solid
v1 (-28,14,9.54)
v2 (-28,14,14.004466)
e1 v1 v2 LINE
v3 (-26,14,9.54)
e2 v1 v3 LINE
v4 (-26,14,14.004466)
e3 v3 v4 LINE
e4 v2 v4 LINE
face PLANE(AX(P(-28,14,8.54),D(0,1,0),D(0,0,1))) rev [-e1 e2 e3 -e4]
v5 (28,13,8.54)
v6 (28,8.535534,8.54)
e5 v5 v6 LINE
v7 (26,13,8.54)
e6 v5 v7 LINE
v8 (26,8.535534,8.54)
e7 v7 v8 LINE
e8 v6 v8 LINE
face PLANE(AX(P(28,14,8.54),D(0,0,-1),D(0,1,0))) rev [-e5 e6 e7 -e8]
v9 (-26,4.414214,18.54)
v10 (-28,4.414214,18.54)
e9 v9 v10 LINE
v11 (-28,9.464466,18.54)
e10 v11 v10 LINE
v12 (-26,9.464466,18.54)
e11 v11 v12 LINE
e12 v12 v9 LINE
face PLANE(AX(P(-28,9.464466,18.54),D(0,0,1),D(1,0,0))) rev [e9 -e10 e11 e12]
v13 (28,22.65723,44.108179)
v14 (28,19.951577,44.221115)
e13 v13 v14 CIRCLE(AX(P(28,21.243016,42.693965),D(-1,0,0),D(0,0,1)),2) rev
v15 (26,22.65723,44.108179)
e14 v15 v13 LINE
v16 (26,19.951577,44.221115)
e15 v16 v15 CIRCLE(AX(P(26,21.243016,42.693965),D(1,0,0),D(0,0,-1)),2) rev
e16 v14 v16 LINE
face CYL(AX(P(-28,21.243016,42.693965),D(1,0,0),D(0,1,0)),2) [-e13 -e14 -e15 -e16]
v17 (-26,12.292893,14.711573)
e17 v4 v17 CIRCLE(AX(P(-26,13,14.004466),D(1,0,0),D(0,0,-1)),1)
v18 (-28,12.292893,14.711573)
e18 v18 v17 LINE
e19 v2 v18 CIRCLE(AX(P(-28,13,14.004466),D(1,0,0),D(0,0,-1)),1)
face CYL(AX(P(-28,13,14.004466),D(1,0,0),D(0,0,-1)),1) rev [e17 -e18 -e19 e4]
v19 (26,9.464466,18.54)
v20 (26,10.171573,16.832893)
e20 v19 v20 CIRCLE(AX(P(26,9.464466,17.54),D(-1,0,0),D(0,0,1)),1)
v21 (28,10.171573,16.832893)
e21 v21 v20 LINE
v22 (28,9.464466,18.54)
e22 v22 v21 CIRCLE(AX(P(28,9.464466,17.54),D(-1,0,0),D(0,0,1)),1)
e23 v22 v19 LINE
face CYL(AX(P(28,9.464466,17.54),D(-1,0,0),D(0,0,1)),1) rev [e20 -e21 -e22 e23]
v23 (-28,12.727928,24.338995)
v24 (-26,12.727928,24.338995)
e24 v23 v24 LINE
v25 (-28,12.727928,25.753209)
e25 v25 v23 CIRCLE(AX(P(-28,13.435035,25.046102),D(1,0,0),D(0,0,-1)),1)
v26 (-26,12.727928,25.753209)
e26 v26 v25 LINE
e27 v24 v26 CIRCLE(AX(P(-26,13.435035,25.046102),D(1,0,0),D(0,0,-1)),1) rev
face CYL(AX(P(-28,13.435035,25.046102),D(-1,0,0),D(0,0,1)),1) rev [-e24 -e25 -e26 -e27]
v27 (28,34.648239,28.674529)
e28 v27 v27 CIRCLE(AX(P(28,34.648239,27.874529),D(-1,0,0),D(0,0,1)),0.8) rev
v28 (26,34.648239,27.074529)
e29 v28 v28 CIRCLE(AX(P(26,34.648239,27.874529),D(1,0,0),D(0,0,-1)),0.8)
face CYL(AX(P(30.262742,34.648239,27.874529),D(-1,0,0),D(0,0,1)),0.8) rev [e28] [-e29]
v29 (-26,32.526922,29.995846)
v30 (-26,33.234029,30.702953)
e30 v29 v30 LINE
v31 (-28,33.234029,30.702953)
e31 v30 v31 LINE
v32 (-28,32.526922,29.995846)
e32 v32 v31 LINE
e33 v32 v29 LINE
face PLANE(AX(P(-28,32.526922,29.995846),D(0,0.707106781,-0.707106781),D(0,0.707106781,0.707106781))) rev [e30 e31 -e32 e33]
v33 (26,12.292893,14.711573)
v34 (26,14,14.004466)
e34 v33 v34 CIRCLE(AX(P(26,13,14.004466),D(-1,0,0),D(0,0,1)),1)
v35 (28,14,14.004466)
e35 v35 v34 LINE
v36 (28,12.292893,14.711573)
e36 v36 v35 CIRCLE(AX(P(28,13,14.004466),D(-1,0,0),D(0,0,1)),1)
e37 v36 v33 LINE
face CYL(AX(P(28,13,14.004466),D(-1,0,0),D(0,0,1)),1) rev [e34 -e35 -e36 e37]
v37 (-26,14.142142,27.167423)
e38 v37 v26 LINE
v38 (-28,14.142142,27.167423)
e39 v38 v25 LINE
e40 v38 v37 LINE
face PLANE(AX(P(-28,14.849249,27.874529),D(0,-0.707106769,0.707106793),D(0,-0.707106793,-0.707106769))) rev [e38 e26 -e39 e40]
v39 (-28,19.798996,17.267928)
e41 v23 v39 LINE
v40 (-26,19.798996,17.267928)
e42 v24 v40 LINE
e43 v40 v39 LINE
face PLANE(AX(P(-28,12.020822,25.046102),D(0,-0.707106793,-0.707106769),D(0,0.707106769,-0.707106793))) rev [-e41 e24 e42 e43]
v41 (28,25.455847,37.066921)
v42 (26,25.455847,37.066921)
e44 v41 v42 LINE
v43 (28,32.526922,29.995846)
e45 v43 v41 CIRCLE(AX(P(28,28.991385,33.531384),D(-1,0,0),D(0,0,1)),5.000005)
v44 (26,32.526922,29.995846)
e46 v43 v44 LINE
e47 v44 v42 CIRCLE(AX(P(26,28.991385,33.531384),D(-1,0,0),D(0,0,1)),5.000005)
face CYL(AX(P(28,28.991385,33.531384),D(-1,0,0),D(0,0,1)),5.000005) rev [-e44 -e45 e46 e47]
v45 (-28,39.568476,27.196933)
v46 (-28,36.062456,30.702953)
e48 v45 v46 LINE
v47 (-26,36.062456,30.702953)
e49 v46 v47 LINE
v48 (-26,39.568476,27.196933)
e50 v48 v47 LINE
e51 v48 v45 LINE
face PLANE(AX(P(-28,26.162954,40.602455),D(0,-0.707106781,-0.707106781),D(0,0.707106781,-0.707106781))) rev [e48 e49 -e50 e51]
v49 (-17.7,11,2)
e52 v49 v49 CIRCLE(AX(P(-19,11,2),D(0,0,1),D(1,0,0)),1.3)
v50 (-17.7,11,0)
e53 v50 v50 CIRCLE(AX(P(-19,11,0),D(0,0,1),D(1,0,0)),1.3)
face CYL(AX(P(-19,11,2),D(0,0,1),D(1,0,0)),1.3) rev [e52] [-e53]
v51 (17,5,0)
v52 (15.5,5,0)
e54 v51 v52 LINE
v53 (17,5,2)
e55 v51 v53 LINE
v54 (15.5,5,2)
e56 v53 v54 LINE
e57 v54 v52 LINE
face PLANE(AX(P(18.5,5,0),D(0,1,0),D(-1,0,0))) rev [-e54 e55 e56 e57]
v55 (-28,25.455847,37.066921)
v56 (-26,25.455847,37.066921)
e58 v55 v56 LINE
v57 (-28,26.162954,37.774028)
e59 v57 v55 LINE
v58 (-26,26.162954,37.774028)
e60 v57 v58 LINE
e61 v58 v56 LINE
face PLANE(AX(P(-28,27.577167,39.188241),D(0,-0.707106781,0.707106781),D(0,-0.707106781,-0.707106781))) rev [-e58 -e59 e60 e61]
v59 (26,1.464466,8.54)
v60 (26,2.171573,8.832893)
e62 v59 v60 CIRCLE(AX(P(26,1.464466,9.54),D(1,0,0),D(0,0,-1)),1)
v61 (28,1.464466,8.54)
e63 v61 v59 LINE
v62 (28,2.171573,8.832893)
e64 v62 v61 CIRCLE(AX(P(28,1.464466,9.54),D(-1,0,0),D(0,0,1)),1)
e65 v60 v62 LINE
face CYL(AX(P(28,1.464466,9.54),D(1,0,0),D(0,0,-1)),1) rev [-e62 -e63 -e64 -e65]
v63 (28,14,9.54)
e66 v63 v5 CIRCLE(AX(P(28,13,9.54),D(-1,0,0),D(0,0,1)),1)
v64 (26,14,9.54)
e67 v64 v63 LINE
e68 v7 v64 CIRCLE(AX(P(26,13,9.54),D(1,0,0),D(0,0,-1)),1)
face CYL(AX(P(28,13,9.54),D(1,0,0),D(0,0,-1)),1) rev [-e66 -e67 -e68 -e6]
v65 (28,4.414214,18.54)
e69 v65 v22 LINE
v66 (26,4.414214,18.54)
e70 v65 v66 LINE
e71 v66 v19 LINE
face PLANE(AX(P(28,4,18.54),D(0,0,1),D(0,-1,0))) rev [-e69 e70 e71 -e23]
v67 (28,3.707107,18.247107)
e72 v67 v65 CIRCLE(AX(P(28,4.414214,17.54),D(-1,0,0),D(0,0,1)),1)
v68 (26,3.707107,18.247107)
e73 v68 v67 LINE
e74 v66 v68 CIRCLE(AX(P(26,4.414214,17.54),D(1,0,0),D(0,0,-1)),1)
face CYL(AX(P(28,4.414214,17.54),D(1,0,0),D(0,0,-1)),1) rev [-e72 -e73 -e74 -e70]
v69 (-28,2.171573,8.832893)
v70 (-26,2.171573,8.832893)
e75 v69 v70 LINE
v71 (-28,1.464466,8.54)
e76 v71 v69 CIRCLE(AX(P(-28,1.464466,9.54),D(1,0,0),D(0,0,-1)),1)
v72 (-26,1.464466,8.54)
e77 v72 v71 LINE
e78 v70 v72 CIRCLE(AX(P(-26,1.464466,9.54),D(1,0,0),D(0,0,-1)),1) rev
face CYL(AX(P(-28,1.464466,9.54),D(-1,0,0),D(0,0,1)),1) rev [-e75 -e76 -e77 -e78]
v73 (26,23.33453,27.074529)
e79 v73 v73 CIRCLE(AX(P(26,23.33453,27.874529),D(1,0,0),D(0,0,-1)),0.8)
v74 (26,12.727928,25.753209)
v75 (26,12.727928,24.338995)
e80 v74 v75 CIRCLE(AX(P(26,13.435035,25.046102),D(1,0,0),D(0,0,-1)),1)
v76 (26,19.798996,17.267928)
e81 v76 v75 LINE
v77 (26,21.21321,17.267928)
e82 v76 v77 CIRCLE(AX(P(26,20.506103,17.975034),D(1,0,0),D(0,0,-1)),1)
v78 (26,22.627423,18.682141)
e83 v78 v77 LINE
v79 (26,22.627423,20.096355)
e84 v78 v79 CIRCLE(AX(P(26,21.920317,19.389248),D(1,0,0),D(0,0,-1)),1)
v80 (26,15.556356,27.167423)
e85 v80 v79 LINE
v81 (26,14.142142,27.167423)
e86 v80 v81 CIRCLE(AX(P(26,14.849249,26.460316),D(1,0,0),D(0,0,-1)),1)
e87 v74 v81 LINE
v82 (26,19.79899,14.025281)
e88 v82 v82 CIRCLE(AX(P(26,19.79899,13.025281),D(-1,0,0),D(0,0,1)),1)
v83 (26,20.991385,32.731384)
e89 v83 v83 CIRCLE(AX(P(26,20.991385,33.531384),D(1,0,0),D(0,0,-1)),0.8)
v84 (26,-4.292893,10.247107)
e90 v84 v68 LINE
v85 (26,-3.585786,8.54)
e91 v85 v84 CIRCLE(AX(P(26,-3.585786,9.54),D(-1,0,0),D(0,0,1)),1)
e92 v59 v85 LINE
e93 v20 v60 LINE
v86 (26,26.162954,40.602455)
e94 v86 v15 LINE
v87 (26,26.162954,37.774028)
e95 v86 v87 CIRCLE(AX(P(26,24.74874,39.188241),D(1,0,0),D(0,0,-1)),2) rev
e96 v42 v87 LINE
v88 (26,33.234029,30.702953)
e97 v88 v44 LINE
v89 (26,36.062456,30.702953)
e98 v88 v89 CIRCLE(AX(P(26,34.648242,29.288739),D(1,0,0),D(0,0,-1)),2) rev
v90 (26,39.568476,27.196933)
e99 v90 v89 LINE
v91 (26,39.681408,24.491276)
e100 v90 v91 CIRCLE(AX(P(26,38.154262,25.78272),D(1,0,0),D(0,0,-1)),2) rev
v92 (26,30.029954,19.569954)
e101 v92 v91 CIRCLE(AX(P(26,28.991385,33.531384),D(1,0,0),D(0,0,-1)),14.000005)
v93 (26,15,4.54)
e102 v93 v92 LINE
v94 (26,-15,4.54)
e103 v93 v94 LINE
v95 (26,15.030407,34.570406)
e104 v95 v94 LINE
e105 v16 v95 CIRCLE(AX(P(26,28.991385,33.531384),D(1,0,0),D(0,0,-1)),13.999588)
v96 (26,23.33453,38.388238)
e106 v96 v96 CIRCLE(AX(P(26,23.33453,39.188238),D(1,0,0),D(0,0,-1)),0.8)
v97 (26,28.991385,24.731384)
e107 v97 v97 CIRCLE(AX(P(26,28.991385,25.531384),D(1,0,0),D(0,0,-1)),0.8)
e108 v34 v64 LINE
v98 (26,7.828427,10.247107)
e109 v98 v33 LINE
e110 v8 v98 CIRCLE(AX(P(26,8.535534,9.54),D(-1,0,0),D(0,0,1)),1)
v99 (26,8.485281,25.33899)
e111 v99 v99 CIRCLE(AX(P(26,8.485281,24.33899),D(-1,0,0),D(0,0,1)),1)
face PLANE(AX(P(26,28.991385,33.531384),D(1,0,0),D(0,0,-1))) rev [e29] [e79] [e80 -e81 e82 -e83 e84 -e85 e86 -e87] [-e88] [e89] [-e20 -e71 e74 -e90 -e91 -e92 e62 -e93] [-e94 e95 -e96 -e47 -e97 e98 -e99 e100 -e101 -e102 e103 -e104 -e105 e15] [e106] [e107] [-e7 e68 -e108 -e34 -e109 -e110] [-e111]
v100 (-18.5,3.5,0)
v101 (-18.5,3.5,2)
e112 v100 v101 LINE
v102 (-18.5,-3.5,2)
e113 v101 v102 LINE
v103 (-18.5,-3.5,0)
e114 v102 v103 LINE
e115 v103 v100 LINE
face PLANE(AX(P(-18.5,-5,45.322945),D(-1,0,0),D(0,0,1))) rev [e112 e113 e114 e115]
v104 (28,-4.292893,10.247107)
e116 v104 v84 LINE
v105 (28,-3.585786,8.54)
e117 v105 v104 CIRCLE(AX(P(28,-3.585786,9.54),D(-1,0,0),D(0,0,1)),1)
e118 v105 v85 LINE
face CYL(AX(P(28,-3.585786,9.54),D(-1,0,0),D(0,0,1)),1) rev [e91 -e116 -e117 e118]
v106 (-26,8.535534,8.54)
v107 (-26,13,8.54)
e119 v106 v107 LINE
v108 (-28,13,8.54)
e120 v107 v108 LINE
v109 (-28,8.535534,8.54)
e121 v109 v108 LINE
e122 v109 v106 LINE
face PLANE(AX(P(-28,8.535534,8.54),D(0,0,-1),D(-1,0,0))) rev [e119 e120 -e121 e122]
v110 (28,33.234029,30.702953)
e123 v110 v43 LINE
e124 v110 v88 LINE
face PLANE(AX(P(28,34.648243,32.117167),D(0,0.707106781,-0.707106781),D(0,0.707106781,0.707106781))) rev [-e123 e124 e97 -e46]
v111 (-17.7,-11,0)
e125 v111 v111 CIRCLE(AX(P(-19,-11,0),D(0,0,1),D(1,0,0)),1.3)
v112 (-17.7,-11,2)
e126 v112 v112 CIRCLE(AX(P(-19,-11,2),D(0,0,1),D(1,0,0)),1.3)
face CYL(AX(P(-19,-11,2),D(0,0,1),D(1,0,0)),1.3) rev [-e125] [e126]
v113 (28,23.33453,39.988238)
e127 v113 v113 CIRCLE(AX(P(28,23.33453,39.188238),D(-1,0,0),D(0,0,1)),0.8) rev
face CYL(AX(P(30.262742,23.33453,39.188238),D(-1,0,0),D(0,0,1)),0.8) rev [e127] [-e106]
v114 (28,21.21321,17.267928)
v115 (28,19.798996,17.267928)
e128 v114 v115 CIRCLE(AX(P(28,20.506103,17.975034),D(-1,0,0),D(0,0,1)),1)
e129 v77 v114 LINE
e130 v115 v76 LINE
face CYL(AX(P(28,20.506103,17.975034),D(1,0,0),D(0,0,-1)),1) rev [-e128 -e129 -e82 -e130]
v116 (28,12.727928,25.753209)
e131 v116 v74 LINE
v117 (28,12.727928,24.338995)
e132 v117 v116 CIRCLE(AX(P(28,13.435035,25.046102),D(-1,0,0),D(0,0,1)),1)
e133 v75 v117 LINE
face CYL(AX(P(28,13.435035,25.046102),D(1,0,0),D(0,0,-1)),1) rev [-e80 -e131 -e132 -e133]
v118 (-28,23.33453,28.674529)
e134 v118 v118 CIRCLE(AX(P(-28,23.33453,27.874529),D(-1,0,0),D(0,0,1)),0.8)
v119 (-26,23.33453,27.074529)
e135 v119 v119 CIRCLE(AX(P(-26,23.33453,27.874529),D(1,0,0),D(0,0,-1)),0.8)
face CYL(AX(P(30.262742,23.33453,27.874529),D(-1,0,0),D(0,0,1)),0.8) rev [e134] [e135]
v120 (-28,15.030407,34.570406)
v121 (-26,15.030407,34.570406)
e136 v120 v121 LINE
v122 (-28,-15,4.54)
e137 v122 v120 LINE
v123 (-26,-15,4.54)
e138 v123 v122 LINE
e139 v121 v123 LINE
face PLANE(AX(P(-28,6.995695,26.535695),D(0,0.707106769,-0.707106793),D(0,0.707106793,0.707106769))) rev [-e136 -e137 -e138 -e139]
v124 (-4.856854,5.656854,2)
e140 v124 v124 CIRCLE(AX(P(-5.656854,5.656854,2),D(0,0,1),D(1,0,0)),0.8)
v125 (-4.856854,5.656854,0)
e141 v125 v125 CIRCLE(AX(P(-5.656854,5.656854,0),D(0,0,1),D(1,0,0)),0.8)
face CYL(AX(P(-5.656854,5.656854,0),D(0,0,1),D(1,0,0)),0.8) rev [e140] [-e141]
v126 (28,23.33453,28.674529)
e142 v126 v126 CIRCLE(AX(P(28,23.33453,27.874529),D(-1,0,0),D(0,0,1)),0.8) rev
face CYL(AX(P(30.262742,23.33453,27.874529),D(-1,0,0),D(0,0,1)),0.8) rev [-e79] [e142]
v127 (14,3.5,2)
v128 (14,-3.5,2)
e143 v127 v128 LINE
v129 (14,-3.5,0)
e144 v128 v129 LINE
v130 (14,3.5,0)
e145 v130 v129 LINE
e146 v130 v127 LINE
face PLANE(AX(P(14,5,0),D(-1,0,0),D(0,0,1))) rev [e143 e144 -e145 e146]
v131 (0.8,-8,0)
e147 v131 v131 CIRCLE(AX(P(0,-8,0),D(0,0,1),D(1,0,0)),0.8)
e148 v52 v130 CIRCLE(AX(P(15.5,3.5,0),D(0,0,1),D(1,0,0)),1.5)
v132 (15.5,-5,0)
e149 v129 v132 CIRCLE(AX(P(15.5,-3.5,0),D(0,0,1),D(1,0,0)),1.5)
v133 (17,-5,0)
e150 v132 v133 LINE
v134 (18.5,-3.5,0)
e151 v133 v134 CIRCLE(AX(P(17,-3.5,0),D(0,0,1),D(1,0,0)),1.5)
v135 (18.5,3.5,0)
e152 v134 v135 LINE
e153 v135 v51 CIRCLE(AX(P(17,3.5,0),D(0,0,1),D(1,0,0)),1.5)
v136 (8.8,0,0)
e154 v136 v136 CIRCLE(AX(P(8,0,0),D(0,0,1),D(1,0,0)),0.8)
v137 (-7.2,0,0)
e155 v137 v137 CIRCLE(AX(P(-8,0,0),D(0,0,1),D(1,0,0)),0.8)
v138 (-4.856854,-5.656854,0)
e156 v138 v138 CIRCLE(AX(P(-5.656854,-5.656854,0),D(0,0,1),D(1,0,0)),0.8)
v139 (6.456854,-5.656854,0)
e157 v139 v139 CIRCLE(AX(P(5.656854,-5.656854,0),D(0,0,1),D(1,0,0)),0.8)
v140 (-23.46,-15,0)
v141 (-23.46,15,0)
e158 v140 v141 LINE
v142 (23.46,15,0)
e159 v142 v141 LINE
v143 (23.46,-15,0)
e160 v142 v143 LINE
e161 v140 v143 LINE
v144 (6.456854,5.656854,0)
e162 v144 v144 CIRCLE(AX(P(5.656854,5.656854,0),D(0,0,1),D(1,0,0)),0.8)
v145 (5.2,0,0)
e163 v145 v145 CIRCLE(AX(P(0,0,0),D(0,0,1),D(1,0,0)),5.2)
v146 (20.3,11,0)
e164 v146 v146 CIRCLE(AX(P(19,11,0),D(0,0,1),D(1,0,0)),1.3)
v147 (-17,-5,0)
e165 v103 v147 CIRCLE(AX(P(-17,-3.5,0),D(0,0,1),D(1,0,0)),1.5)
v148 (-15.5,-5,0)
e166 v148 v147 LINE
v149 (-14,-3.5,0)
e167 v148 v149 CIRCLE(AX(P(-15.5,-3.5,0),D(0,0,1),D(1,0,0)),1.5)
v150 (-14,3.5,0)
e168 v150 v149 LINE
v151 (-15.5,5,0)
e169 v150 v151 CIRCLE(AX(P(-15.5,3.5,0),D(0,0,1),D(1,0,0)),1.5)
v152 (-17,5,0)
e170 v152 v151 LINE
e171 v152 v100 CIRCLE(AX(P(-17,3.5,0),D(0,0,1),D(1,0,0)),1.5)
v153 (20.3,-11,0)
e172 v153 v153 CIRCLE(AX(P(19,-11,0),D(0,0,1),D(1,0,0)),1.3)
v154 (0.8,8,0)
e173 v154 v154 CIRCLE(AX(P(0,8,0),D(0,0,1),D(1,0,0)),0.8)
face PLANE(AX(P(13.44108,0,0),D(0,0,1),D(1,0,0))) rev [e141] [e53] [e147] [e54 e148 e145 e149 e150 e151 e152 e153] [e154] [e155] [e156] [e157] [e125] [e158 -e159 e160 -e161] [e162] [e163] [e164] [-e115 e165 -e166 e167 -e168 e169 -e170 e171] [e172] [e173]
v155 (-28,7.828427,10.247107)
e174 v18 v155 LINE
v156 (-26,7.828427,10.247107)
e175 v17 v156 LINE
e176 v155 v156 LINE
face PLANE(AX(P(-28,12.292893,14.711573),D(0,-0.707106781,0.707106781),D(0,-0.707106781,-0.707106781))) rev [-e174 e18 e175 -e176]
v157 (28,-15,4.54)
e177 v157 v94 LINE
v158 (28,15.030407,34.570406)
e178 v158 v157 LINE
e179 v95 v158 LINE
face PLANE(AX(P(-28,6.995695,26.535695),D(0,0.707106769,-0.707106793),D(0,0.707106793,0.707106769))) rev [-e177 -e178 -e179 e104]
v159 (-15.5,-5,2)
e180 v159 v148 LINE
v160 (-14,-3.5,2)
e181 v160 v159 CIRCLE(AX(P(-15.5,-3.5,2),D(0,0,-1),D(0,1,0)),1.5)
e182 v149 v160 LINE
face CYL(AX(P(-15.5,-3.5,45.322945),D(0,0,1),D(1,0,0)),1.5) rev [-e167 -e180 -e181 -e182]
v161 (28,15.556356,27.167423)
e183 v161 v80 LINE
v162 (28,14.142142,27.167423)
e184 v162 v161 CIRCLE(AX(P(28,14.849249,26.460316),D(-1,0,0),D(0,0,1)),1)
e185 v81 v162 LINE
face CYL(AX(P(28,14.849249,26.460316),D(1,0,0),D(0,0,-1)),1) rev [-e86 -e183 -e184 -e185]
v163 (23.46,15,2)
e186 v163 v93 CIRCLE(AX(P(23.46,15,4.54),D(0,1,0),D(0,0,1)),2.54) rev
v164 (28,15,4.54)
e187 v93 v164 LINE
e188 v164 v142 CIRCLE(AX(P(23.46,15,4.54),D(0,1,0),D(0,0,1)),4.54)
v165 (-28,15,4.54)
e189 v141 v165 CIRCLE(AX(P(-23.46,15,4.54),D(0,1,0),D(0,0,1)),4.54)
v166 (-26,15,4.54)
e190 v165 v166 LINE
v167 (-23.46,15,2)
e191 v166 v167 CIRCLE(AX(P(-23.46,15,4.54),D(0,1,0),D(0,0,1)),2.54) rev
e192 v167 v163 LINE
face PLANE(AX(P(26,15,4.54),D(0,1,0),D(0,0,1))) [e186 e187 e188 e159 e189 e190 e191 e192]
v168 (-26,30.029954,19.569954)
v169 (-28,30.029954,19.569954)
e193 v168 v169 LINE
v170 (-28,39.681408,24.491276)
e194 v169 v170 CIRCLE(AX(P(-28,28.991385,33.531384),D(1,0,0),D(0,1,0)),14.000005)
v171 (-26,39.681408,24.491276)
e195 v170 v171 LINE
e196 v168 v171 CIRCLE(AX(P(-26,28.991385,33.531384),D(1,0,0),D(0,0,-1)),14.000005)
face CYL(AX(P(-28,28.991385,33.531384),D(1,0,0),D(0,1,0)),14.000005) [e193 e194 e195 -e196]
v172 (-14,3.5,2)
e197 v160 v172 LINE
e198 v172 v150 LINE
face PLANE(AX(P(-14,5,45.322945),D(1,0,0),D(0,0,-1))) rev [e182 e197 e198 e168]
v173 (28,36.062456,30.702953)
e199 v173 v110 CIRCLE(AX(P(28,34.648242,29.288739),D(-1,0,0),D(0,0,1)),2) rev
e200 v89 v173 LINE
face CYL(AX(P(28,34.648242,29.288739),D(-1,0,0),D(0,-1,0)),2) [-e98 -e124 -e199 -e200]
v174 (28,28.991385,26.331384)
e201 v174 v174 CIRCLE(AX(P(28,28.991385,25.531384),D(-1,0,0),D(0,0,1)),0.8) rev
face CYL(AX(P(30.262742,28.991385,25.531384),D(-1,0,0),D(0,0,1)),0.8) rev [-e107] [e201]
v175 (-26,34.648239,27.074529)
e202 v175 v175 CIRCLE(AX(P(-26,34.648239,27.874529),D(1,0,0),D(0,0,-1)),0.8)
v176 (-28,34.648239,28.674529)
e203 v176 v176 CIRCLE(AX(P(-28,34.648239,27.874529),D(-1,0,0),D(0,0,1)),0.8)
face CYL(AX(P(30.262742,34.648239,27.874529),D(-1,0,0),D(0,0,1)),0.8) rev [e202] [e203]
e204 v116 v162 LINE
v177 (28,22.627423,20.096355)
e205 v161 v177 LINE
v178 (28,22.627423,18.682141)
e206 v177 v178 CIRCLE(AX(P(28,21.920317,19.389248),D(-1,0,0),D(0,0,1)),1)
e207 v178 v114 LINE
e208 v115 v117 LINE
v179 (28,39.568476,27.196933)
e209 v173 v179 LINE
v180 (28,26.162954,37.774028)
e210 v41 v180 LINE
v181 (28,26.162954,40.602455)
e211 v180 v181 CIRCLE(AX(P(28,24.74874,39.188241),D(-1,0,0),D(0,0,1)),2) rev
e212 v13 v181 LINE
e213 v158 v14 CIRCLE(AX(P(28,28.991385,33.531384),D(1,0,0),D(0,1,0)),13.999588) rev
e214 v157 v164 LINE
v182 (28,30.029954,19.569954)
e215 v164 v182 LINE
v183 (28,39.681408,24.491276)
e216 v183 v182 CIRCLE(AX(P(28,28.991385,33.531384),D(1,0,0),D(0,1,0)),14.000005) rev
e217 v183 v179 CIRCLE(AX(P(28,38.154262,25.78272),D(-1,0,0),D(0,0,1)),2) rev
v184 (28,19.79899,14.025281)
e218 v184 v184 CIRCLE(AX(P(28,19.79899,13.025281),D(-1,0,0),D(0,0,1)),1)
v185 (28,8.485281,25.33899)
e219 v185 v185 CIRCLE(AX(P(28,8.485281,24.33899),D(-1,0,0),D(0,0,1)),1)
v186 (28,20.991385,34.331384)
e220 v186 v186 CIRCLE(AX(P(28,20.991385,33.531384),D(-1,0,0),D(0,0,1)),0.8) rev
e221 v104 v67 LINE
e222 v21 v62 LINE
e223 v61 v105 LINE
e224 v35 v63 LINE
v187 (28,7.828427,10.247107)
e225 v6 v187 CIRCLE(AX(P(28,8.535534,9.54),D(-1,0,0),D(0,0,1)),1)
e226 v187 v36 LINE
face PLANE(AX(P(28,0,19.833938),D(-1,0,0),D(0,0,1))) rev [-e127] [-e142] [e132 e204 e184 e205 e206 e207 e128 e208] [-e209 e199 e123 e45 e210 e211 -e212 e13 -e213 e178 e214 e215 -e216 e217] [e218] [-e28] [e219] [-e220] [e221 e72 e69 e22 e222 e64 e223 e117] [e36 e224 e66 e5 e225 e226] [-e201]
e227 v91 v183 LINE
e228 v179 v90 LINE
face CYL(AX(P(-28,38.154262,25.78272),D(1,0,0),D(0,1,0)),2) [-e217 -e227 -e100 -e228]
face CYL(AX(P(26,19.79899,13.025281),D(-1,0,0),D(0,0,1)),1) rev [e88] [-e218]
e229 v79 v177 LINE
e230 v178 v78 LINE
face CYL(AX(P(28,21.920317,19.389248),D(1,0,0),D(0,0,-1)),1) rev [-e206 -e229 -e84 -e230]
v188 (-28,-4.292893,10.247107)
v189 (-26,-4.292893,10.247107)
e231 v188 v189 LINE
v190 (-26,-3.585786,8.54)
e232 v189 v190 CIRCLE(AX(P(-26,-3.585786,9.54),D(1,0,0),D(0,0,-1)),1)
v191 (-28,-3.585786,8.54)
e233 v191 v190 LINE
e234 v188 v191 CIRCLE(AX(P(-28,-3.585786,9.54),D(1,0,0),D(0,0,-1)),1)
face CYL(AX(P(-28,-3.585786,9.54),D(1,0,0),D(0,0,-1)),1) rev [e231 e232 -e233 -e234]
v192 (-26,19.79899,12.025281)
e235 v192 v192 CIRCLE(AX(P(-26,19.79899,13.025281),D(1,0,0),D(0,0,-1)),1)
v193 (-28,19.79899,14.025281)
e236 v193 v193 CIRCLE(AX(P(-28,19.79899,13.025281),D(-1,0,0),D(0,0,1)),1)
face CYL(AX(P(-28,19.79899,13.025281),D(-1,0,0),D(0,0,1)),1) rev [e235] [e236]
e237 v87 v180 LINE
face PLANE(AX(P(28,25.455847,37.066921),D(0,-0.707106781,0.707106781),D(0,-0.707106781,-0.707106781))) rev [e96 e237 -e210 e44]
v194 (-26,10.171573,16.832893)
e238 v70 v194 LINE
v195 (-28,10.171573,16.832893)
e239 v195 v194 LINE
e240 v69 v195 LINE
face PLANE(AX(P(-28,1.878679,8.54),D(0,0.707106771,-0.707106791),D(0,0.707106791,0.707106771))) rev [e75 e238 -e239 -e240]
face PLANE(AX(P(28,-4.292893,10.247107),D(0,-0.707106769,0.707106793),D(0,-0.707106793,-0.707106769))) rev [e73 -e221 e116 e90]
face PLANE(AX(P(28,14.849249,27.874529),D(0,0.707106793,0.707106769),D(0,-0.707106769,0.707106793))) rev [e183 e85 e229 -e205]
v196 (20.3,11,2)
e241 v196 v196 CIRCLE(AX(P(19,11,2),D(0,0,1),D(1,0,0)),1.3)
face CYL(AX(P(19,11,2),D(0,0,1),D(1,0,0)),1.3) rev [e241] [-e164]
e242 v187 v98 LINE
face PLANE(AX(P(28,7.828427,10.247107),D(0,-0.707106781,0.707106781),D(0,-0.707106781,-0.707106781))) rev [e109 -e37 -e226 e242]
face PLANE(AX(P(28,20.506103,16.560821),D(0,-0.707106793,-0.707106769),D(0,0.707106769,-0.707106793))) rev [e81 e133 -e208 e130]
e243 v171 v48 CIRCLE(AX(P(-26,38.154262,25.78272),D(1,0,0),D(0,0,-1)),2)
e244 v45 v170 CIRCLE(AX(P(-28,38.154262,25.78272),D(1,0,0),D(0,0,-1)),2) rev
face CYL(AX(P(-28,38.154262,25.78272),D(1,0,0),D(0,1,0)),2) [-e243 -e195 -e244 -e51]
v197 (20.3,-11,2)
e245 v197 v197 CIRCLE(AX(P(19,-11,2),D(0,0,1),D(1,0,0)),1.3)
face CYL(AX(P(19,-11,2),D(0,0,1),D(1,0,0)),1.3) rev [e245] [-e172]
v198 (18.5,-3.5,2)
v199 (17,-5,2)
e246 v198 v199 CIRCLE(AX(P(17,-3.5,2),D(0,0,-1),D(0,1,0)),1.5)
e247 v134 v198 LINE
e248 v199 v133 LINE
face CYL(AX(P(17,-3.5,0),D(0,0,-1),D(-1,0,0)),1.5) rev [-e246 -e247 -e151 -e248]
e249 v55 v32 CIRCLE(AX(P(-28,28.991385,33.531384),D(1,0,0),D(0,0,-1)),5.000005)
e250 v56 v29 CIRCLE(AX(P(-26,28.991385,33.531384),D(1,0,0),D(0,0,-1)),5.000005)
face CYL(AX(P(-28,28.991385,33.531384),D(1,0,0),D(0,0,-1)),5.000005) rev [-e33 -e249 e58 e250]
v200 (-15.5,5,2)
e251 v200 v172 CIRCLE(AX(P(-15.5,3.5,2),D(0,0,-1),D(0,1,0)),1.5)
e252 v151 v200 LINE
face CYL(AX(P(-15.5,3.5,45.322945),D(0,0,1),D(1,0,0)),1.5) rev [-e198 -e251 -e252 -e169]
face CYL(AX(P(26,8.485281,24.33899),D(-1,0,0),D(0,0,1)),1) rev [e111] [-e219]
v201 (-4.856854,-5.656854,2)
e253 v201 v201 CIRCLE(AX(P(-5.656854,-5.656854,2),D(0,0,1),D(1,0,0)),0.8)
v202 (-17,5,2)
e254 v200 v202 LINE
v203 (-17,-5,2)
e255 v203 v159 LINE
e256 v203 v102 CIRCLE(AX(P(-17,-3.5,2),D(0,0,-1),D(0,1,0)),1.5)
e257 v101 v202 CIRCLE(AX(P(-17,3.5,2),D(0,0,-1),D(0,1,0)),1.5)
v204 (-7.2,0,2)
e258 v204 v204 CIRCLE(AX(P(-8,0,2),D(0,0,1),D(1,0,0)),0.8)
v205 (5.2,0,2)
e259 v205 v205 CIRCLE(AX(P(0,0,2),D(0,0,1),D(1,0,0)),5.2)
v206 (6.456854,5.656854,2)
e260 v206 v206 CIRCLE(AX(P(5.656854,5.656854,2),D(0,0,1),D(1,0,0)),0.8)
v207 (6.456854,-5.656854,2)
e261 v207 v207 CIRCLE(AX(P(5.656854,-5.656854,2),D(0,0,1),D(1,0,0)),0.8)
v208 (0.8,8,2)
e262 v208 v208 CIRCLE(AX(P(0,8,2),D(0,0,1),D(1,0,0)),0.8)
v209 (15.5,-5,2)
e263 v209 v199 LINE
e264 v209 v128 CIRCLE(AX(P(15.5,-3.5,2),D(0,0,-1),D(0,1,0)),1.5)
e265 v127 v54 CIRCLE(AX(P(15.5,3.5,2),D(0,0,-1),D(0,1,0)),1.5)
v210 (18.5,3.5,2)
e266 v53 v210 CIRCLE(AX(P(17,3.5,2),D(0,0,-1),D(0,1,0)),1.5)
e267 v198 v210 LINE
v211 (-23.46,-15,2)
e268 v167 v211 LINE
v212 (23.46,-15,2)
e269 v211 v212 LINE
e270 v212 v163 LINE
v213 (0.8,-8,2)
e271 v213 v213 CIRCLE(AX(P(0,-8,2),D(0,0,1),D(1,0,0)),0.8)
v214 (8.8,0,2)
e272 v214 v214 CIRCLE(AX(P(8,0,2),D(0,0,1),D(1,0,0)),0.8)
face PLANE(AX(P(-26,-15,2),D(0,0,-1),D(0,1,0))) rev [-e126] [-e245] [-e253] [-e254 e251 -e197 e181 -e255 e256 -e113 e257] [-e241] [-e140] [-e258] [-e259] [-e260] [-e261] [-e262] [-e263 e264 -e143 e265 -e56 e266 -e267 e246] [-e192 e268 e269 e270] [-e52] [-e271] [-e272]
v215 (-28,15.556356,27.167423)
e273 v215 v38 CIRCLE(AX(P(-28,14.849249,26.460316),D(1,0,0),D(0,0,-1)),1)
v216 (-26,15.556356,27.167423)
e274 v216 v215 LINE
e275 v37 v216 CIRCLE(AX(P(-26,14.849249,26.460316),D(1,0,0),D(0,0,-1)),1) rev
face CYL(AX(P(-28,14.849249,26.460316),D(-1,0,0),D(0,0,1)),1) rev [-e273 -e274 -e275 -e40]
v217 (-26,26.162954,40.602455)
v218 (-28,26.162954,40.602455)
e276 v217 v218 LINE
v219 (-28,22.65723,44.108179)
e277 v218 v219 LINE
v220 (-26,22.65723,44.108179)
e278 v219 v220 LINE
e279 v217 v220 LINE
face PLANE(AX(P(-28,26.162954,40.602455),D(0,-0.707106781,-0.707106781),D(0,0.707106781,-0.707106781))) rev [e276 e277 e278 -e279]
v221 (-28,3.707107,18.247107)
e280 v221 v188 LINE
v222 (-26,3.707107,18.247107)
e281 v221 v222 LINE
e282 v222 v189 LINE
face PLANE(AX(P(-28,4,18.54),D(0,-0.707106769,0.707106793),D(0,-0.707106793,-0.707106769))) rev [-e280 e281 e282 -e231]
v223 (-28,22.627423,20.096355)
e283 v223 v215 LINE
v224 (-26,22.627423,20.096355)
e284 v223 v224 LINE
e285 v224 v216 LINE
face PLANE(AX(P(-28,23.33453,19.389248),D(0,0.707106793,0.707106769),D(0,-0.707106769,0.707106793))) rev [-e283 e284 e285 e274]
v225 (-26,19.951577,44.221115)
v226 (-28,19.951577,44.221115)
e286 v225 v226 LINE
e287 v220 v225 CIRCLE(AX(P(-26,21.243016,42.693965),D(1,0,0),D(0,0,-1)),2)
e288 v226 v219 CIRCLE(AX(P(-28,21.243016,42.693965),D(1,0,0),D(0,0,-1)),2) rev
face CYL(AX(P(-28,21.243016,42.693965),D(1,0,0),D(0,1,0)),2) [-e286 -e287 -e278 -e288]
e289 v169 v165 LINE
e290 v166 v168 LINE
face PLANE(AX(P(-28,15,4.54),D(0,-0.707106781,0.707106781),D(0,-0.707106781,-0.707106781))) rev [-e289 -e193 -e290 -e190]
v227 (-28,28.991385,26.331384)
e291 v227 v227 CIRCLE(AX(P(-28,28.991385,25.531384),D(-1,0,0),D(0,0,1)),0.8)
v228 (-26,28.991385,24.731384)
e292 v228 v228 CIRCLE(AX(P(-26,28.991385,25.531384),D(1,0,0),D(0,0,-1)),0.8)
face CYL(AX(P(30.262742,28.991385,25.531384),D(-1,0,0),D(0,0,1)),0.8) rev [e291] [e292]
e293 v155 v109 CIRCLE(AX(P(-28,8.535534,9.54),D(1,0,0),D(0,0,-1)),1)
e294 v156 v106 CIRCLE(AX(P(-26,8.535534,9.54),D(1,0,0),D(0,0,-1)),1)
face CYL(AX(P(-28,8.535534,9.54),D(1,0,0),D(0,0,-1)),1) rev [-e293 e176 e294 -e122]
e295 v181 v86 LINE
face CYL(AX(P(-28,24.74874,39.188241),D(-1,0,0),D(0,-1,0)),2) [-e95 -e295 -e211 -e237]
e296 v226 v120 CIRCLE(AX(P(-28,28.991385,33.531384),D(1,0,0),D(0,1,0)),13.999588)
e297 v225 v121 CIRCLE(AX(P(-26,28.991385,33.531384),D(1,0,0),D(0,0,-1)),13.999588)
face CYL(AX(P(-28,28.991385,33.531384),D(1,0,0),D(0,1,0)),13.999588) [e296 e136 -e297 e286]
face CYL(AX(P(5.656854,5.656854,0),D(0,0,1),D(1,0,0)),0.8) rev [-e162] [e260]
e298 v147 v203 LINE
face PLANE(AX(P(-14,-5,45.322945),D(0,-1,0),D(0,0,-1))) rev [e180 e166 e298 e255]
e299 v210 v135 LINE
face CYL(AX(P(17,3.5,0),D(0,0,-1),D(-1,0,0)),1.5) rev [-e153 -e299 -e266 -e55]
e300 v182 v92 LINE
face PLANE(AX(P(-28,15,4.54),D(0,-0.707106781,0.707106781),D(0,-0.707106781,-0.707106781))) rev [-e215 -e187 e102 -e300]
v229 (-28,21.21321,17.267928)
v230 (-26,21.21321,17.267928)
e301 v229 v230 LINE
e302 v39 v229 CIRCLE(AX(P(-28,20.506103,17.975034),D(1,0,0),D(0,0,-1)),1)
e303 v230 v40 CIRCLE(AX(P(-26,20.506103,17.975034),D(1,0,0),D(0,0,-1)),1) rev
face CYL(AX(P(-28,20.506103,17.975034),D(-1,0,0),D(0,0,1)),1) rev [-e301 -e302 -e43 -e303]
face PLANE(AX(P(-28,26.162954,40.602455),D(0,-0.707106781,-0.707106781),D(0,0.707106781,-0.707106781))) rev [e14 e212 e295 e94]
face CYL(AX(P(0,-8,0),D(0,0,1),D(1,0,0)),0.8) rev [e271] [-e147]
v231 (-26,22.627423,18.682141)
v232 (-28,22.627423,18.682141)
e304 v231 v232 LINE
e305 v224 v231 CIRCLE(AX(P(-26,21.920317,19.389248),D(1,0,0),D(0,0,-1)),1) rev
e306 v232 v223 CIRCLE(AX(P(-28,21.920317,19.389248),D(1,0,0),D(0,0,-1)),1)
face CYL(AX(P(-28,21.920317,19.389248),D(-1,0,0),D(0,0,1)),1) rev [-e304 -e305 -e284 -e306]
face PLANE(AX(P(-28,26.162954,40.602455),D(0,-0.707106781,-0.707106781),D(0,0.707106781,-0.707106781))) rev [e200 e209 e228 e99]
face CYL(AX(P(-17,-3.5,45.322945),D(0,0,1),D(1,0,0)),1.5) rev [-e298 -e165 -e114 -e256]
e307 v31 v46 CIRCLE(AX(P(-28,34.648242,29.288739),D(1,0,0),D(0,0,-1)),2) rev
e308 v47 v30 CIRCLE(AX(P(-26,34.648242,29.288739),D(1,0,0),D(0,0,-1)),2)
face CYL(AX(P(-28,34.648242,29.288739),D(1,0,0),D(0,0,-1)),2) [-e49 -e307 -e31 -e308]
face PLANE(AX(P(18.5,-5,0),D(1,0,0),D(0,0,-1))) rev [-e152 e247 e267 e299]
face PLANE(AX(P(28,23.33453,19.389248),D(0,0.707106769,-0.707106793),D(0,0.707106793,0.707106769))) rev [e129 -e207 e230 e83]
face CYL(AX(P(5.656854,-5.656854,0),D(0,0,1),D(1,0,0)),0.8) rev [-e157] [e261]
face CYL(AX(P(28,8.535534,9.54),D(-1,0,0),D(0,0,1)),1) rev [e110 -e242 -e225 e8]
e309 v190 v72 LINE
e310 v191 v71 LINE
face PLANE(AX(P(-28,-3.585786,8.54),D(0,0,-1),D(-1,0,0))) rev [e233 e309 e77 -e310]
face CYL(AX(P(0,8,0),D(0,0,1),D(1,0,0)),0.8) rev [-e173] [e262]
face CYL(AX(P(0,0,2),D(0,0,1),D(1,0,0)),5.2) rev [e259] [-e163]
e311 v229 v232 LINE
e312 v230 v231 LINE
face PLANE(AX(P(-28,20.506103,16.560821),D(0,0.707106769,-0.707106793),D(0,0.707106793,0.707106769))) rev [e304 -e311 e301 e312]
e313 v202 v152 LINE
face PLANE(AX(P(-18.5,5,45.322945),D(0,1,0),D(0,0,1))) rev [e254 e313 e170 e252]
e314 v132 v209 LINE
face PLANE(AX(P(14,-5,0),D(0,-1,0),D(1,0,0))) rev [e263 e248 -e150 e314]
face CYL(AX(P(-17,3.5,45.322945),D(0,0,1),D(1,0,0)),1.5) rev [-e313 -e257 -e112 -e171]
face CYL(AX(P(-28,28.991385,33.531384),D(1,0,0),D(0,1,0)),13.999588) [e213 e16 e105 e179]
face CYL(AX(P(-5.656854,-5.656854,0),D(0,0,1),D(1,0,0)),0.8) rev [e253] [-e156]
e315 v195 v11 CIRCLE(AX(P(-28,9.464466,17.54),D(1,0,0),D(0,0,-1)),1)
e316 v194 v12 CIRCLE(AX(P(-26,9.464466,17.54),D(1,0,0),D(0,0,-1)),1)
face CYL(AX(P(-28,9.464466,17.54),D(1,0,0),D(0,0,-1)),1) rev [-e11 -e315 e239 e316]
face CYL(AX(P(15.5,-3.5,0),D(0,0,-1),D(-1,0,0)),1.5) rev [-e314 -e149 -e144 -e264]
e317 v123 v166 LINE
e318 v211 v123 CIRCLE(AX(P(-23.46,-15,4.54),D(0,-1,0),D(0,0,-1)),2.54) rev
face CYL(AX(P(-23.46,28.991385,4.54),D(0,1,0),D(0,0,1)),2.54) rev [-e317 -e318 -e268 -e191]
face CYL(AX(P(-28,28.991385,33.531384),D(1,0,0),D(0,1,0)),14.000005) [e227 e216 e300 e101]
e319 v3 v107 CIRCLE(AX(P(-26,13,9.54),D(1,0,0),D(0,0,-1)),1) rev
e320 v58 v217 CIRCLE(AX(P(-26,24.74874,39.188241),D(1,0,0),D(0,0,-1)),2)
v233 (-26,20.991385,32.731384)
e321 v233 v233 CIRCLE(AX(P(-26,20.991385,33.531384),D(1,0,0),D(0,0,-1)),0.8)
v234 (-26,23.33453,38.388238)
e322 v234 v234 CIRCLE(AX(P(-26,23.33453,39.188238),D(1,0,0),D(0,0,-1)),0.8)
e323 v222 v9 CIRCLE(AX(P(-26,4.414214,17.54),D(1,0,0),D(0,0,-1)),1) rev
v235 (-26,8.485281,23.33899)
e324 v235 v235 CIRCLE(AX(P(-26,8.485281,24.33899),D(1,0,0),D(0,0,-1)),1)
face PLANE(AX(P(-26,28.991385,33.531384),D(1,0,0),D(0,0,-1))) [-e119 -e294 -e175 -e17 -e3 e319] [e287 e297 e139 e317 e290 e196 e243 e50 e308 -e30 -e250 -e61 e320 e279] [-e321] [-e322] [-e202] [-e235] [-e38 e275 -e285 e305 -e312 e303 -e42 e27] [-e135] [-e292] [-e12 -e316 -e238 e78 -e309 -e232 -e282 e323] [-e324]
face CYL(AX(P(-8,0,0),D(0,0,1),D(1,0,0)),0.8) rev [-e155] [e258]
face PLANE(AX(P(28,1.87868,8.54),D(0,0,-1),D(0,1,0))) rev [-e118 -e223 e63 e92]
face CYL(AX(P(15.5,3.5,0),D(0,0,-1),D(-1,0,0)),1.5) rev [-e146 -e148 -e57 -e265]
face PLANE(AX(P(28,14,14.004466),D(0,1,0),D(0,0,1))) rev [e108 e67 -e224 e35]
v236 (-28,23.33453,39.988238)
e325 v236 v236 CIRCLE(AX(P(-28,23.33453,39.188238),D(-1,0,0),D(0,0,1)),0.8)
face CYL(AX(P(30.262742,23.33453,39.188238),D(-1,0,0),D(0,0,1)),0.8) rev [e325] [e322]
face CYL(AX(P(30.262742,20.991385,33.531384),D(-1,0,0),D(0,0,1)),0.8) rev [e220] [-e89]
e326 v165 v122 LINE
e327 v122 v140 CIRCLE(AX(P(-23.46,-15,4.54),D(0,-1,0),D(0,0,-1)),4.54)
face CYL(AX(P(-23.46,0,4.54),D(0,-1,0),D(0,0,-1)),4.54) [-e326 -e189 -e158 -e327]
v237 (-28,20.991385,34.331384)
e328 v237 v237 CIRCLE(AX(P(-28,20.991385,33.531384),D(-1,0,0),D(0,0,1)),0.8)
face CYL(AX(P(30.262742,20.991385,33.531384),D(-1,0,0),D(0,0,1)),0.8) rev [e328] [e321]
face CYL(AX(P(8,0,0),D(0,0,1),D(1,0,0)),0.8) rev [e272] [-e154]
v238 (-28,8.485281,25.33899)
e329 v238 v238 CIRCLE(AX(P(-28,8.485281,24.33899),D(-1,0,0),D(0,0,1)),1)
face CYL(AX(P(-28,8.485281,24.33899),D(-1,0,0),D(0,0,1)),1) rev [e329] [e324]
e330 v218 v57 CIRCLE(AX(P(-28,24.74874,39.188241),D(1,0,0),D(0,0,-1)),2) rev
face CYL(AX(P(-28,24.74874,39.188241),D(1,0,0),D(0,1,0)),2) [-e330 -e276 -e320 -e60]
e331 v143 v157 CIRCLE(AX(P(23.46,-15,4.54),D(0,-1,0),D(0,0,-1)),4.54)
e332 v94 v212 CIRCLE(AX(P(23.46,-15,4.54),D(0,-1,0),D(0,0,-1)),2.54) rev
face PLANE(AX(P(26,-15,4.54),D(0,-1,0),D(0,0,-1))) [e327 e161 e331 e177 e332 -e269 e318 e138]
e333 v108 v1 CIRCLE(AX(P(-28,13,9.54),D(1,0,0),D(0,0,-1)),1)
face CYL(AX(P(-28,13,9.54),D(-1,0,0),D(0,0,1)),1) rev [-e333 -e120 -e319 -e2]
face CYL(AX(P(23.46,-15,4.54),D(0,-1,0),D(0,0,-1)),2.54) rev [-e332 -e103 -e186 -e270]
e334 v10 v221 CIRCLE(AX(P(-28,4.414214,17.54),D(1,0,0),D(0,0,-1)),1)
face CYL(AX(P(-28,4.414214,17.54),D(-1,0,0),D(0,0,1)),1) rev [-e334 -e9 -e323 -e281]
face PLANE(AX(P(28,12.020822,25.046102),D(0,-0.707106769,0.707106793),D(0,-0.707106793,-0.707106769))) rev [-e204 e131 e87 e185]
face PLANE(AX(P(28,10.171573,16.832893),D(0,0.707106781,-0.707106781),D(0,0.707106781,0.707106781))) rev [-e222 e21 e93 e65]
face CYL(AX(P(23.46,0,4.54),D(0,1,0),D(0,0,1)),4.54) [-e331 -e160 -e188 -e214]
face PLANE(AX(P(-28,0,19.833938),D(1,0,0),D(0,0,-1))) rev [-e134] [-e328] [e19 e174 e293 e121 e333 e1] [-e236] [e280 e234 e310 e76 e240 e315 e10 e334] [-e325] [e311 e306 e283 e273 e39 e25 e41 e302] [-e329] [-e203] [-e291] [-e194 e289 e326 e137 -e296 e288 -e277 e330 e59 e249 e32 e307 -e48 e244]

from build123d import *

# Parameters (mm, degrees)
KES_EKSTR_ZYON1_START          = -54
KES_EKSTR_ZYON1_OUTLINE_W      = 2
KES_EKSTR_ZYON1_OUTLINE_H      = 30
KES_EKSTR_ZYON1_DEPTH          = 56
KES_EKSTR_ZYON1_2_DEPTH        = 2
KES_EKSTR_ZYON1_3_DEPTH        = 2
KES_EKSTR_ZYON2_DEPTH          = 82.444892691
KES_EKSTR_ZYON3_DEPTH          = 82.444892691
KES_EKSTR_ZYON4_REACH          = 69.092
IZIM4_W                        = 4.5
IZIM4_H                        = 10
KES_EKSTR_ZYON5_DEPTH          = 82.444892691
KES_EKSTR_ZYON6_DEPTH          = 82.444892691
KES_EKSTR_ZYON7_DEPTH          = 82.444892691
KES_EKSTR_ZYON8_DEPTH          = 82.444892691
KES_EKSTR_ZYON9_DEPTH          = 82.444892691
KES_EKSTR_ZYON10_DEPTH         = 82.444892691
IZIM11_W                       = 4.5
IZIM11_H                       = 10
KES_EKSTR_ZYON11_DEPTH         = 66.75699783
DELIK1_D                       = 2.6
DELIK2_D                       = 10.4
F_0_2_0_2_DIAMETER_HOLE1_D     = 2
F_0_2_0_2_DIAMETER_HOLE1_DEPTH = 2
F_0_2_0_2_DIAMETER_HOLE2_D     = 2
RADYUS1_R                      = 1
RADYUS2_R                      = 1.5
RADYUS3_R                      = 2
RADYUS4_R                      = 2.54
RADYUS5_R                      = 4.54
IZIM24_R                       = 13.505605706
IZIM24_R_2                     = 7.578470051
Y_KSEKLIK_EKSTR_ZYON1_DEPTH    = 2
IZIM25_R                       = 0.8
KES_EKSTR_ZYON12_DEPTH         = 2
KES_EKSTR_ZYON13_REACH         = 84.134
IZIM27_R                       = 0.8


with BuildPart() as part:
    # Kes-Ekstrüzyon1: read off the stored shape, not the designer's step
    # Kes-Ekstrüzyon1 outline → Kes-Ekstrüzyon1 (new body)
    with BuildSketch(Plane(origin=(26, 0, 0), x_dir=(0, 0, -1), z_dir=(1, 0, 0)).offset(KES_EKSTR_ZYON1_START)):
        with Locations((-1, 0)):
            Rectangle(KES_EKSTR_ZYON1_OUTLINE_W, KES_EKSTR_ZYON1_OUTLINE_H)
    extrude(amount=KES_EKSTR_ZYON1_DEPTH)

    # Kes-Ekstr_zyon1 2 outline → Kes-Ekstr_zyon1 2 (add)
    with BuildSketch(Plane(origin=(26, 0, 0), x_dir=(0, 0, -1), z_dir=(1, 0, 0)).offset(KES_EKSTR_ZYON1_START)):
        with BuildLine():
            Line((-4.54, 15), (-19.569954037, 30.029954037))
            ThreePointArc((-19.569954037, 30.029954037), (-21.507688424, 36.162918334), (-25.983160829, 40.78224863))
            Line((-25.983160829, 40.78224863), (-45.321945481, 21.443463382))
            ThreePointArc((-45.321945481, 21.443463382), (-40.702951136, 16.968195195), (-34.570405924, 15.030406939))
            Line((-34.570405924, 15.030406939), (-4.54, -15))
            Line((-4.54, -15), (-2, -15))
            Line((-2, -15), (-2, 15))
            Line((-2, 15), (-4.54, 15))
        make_face()
    extrude(amount=KES_EKSTR_ZYON1_2_DEPTH)

    # Kes-Ekstr_zyon1 3 outline → Kes-Ekstr_zyon1 3 (add)
    with BuildSketch(Plane(origin=(26, 0, 0), x_dir=(0, 0, -1), z_dir=(1, 0, 0))):
        with BuildLine():
            Line((-4.54, 15), (-19.569954037, 30.029954037))
            ThreePointArc((-19.569954037, 30.029954037), (-21.507688424, 36.162918334), (-25.983160829, 40.78224863))
            Line((-25.983160829, 40.78224863), (-45.321945481, 21.443463382))
            ThreePointArc((-45.321945481, 21.443463382), (-40.702951136, 16.968195195), (-34.570405924, 15.030406939))
            Line((-34.570405924, 15.030406939), (-4.54, -15))
            Line((-4.54, -15), (-2, -15))
            Line((-2, -15), (-2, 15))
            Line((-2, 15), (-4.54, 15))
        make_face()
    extrude(amount=KES_EKSTR_ZYON1_3_DEPTH)

    # Çizim2 → Kes-Ekstrüzyon2 (cut, through all)
    with BuildSketch(Plane.ZY.offset(-26)):
        with BuildLine():
            Line((39.188241686, 27.577167772), (32.117166758, 34.648242701))
            Line((32.117166758, 34.648242701), (29.995846117, 32.52692206))
            ThreePointArc((29.995846117, 32.52692206), (29.995846117, 25.455847131), (37.066921045, 25.455847131))
            Line((37.066921045, 25.455847131), (39.188241686, 27.577167772))
        make_face()
    extrude(amount=-KES_EKSTR_ZYON2_DEPTH, mode=Mode.SUBTRACT)

    # Çizim3 → Kes-Ekstrüzyon3 (cut, through all)
    with BuildSketch(Plane(origin=(-26, 0, 0), x_dir=(0, 0, -1), z_dir=(1, 0, 0))):
        with BuildLine():
            Line((-32.11716646, 34.648242403), (-39.188241389, 27.577167475))
            Line((-39.188241389, 27.577167475), (-37.066921045, 25.455847131))
            ThreePointArc((-37.066921045, 25.455847131), (-29.995846117, 25.455847131), (-29.995846117, 32.52692206))
            Line((-29.995846117, 32.52692206), (-32.11716646, 34.648242403))
        make_face()
    extrude(amount=-KES_EKSTR_ZYON3_DEPTH, mode=Mode.SUBTRACT)

    # Çizim4 → Kes-Ekstrüzyon4 (cut, up to next)
    with BuildSketch(Plane(origin=(0, 0, 0), x_dir=(-1, 0, 0), z_dir=(0, 0, -1)), mode=Mode.PRIVATE) as kes_ekstr_zyon4_sk1:
        with Locations((16.25, 0)):
            Rectangle(IZIM4_W, IZIM4_H)
    kes_ekstr_zyon4_tool1 = extrude(kes_ekstr_zyon4_sk1.sketch, amount=-KES_EKSTR_ZYON4_REACH, mode=Mode.PRIVATE) & part.part
    add(kes_ekstr_zyon4_tool1.solids().sort_by_distance((-16.25, 0, 0))[0], mode=Mode.SUBTRACT)

    # Çizim5 → Kes-Ekstrüzyon5 (cut, through all)
    with BuildSketch(Plane.ZY.offset(-26)):
        with BuildLine():
            Line((10.247106781, 7.828427125), (14.711572875, 12.292893219))
            ThreePointArc((14.711572875, 12.292893219), (14.928345627, 13.382683432), (14.004466094, 14))
            Line((14.004466094, 14), (8.54, 14))
            Line((8.54, 14), (8.54, 8.535533906))
            ThreePointArc((8.54, 8.535533906), (9.157316568, 7.611654373), (10.247106781, 7.828427125))
        make_face()
    extrude(amount=-KES_EKSTR_ZYON5_DEPTH, mode=Mode.SUBTRACT)

    # Çizim6 → Kes-Ekstrüzyon6 (cut, through all)
    with BuildSketch(Plane.ZY.offset(-26)):
        Polygon((27.874529335, 14.849248859), (19.389247817, 23.334530089), (16.56082074, 20.506102917), (25.046102258, 12.020821686), align=None)
    extrude(amount=-KES_EKSTR_ZYON6_DEPTH, mode=Mode.SUBTRACT)

    # Çizim7 → Kes-Ekstrüzyon7 (cut, through all)
    with BuildSketch(Plane.ZY.offset(-26)):
        with BuildLine():
            Line((16.832893122, 10.171572778), (8.54, 1.878679656))
            Line((8.54, 1.878679656), (8.54, -3.585786438))
            ThreePointArc((8.54, -3.585786438), (9.157316575, -4.509665973), (10.247106793, -4.292893207))
            Line((10.247106793, -4.292893207), (18.539999854, 4.000000134))
            Line((18.539999854, 4.000000134), (18.539999854, 9.464466017))
            ThreePointArc((18.539999854, 9.464466017), (17.922683304, 10.388345523), (16.832893122, 10.171572778))
        make_face()
    extrude(amount=-KES_EKSTR_ZYON7_DEPTH, mode=Mode.SUBTRACT)

    # Çizim8 → Kes-Ekstrüzyon8 (cut, through all)
    with BuildSketch(Plane(origin=(-26, 0, 0), x_dir=(0, 0, -1), z_dir=(1, 0, 0))):
        with BuildLine():
            Line((-8.54, 8.535533906), (-8.54, 14))
            Line((-8.54, 14), (-14.004466094, 14))
            ThreePointArc((-14.004466094, 14), (-14.928345627, 13.382683432), (-14.711572875, 12.292893219))
            Line((-14.711572875, 12.292893219), (-10.247106781, 7.828427125))
            ThreePointArc((-10.247106781, 7.828427125), (-9.157316568, 7.611654373), (-8.54, 8.535533906))
        make_face()
    extrude(amount=-KES_EKSTR_ZYON8_DEPTH, mode=Mode.SUBTRACT)

    # Çizim9 → Kes-Ekstrüzyon9 (cut, through all)
    with BuildSketch(Plane(origin=(-26, 0, 0), x_dir=(0, 0, -1), z_dir=(1, 0, 0))):
        Polygon((-19.389247817, 23.334530089), (-27.874529335, 14.849248859), (-25.046102258, 12.020821686), (-16.56082074, 20.506102917), align=None)
    extrude(amount=-KES_EKSTR_ZYON9_DEPTH, mode=Mode.SUBTRACT)

    # Çizim10 → Kes-Ekstrüzyon10 (cut, through all)
    with BuildSketch(Plane(origin=(-26, 0, 0), x_dir=(0, 0, -1), z_dir=(1, 0, 0))):
        with BuildLine():
            Line((-18.539999854, 9.46446608), (-18.539999854, 4.000000134))
            Line((-18.539999854, 4.000000134), (-10.247106757, -4.292893243))
            ThreePointArc((-10.247106757, -4.292893243), (-9.157316576, -4.509666002), (-8.540000021, -3.585786497))
            Line((-8.540000021, -3.585786497), (-8.540000021, 1.878679489))
            Line((-8.540000021, 1.878679489), (-16.83289312, 10.171572827))
            ThreePointArc((-16.83289312, 10.171572827), (-17.9226833, 10.388345584), (-18.539999854, 9.46446608))
        make_face()
    extrude(amount=-KES_EKSTR_ZYON10_DEPTH, mode=Mode.SUBTRACT)

    # Çizim11 → Kes-Ekstrüzyon11 (cut, through all)
    with BuildSketch(Plane.XY.offset(2)):
        with Locations((16.25, 0)):
            Rectangle(IZIM11_W, IZIM11_H)
    extrude(amount=-KES_EKSTR_ZYON11_DEPTH, mode=Mode.SUBTRACT)

    # Delik1 (through all)
    with Locations(Plane.XY.offset(2)):
        with Locations((-19, 11), (19, 11), (-19, -11), (19, -11), (7.778174593, 7.778174593), (11, 0), (7.778174593, -7.778174593), (0, -11), (-7.778174593, -7.778174593), (-11, 0), (-7.778174593, 7.778174593), (0, 11)):
            Hole(DELIK1_D / 2)

    # Delik2 (through all)
    with Locations(Plane.XY.offset(2)):
        with Locations((0, 0)):
            Hole(DELIK2_D / 2)

    # Ø0.2 (0.2) Diameter Hole1
    with Locations(Plane.ZY.offset(28)):
        with Locations((24.338989873, 8.485281374), (13.025281374, 19.798989873)):
            Hole(F_0_2_0_2_DIAMETER_HOLE1_D / 2, depth=F_0_2_0_2_DIAMETER_HOLE1_DEPTH)

    # Ø0.2 (0.2) Diameter Hole2 (through all)
    with Locations(Plane.ZY.offset(-26)):
        with Locations((24.338989873, 8.485281374), (13.025281374, 19.798989873)):
            Hole(F_0_2_0_2_DIAMETER_HOLE2_D / 2)

    # Radyus1
    radyus1_edges = [part.edges().sort_by_distance(p)[0] for p in [
        (27, 14, 8.54),
        (27, 14.849248859, 27.874529335),
        (27, 12.020821686, 25.046102258),
        (27, 20.506102917, 16.56082074),
        (27, 23.334530089, 19.389247817),
        (27, 4.000000134, 18.539999854),
        (27, 1.878679656, 8.54),
        (-27, 14, 8.54),
        (-27, 23.334530089, 19.389247817),
        (-27, 20.506102917, 16.56082074),
        (-27, 12.020821686, 25.046102258),
        (-27, 14.849248859, 27.874529335),
        (-27, 1.878679489, 8.540000021),
        (-27, 4.000000134, 18.539999854),
    ]]
    fillet(radyus1_edges, radius=RADYUS1_R)

    # Radyus2
    radyus2_edges = [part.edges().sort_by_distance(p)[0] for p in [
        (-14, 5, 1),
        (-18.5, 5, 1),
        (-18.5, -5, 1),
        (-14, -5, 1),
        (18.5, -5, 1),
        (14, -5, 1),
        (14, 5, 1),
        (18.5, 5, 1),
    ]]
    fillet(radyus2_edges, radius=RADYUS2_R)

    # Radyus3
    radyus3_edges = [part.edges().sort_by_distance(p)[0] for p in [
        (27, 21.443463382, 45.321945481),
        (-27, 40.78224863, 25.983160829),
        (-27, 21.443463382, 45.321945481),
        (27, 40.78224863, 25.983160829),
        (27, 27.577167772, 39.188241686),
        (27, 34.648242701, 32.117166758),
        (-27, 34.648242403, 32.11716646),
        (-27, 27.577167475, 39.188241389),
    ]]
    fillet(radyus3_edges, radius=RADYUS3_R)

    # Radyus4
    radyus4_edges = [part.edges().sort_by_distance(p)[0] for p in [
        (-26, 0, 2),
        (26, 0, 2),
    ]]
    fillet(radyus4_edges, radius=RADYUS4_R)

    # Radyus5
    radyus5_edges = [part.edges().sort_by_distance(p)[0] for p in [
        (-28, 0, 0),
        (28, 0, 0),
    ]]
    fillet(radyus5_edges, radius=RADYUS5_R)

    # Çizim24 → Yükseklik-Ekstrüzyon1 (add)
    with BuildSketch(Plane.XY.offset(2)):
        Circle(IZIM24_R)
        Circle(IZIM24_R_2, mode=Mode.SUBTRACT)
    extrude(amount=-Y_KSEKLIK_EKSTR_ZYON1_DEPTH)

    # Çizim25 → Kes-Ekstrüzyon12 (cut)
    with BuildSketch(Plane.XY.offset(2)):
        with Locations((0, 8)):
            Circle(IZIM25_R)
        with Locations((5.656854249, 5.656854249)):
            Circle(IZIM25_R)
        with Locations((8, 0)):
            Circle(IZIM25_R)
        with Locations((5.656854249, -5.656854249)):
            Circle(IZIM25_R)
        with Locations((0, -8)):
            Circle(IZIM25_R)
        with Locations((-5.656854249, -5.656854249)):
            Circle(IZIM25_R)
        with Locations((-8, 0)):
            Circle(IZIM25_R)
        with Locations((-5.656854249, 5.656854249)):
            Circle(IZIM25_R)
    extrude(amount=-KES_EKSTR_ZYON12_DEPTH, mode=Mode.SUBTRACT)

    # Kes-Ekstrüzyon13: up to this face of the body (flat: up to its plane)
    kes_ekstr_zyon13_end = Plane(part.part.faces().sort_by_distance((28, 15.486105726, 21.072998549))[0])
    # Çizim27 → Kes-Ekstrüzyon13 (cut, up to the picked face)
    with BuildSketch(Plane.ZY.offset(28), mode=Mode.PRIVATE) as kes_ekstr_zyon13_sk1:
        with Locations((39.18823783, 23.334530346)):
            Circle(IZIM27_R)
    kes_ekstr_zyon13_tool1 = split(extrude(kes_ekstr_zyon13_sk1.sketch, amount=-KES_EKSTR_ZYON13_REACH, mode=Mode.PRIVATE), bisect_by=kes_ekstr_zyon13_end, keep=Keep.BOTH, mode=Mode.PRIVATE)
    # Çizim27 → Kes-Ekstrüzyon13 (cut, up to the picked face)
    with BuildSketch(Plane.ZY.offset(28), mode=Mode.PRIVATE) as kes_ekstr_zyon13_sk2:
        with Locations((33.531383581, 20.991384595)):
            Circle(IZIM27_R)
    kes_ekstr_zyon13_tool2 = split(extrude(kes_ekstr_zyon13_sk2.sketch, amount=-KES_EKSTR_ZYON13_REACH, mode=Mode.PRIVATE), bisect_by=kes_ekstr_zyon13_end, keep=Keep.BOTH, mode=Mode.PRIVATE)
    # Çizim27 → Kes-Ekstrüzyon13 (cut, up to the picked face)
    with BuildSketch(Plane.ZY.offset(28), mode=Mode.PRIVATE) as kes_ekstr_zyon13_sk3:
        with Locations((27.874529331, 23.334530346)):
            Circle(IZIM27_R)
    kes_ekstr_zyon13_tool3 = split(extrude(kes_ekstr_zyon13_sk3.sketch, amount=-KES_EKSTR_ZYON13_REACH, mode=Mode.PRIVATE), bisect_by=kes_ekstr_zyon13_end, keep=Keep.BOTH, mode=Mode.PRIVATE)
    # Çizim27 → Kes-Ekstrüzyon13 (cut, up to the picked face)
    with BuildSketch(Plane.ZY.offset(28), mode=Mode.PRIVATE) as kes_ekstr_zyon13_sk4:
        with Locations((25.531383581, 28.991384595)):
            Circle(IZIM27_R)
    kes_ekstr_zyon13_tool4 = split(extrude(kes_ekstr_zyon13_sk4.sketch, amount=-KES_EKSTR_ZYON13_REACH, mode=Mode.PRIVATE), bisect_by=kes_ekstr_zyon13_end, keep=Keep.BOTH, mode=Mode.PRIVATE)
    # Çizim27 → Kes-Ekstrüzyon13 (cut, up to the picked face)
    with BuildSketch(Plane.ZY.offset(28), mode=Mode.PRIVATE) as kes_ekstr_zyon13_sk5:
        with Locations((27.874529331, 34.648238845)):
            Circle(IZIM27_R)
    kes_ekstr_zyon13_tool5 = split(extrude(kes_ekstr_zyon13_sk5.sketch, amount=-KES_EKSTR_ZYON13_REACH, mode=Mode.PRIVATE), bisect_by=kes_ekstr_zyon13_end, keep=Keep.BOTH, mode=Mode.PRIVATE)
    add(kes_ekstr_zyon13_tool1.solids().sort_by(Axis((-28, 23.33453, 39.188238), (1, 0, 0)))[0], mode=Mode.SUBTRACT)
    add(kes_ekstr_zyon13_tool2.solids().sort_by(Axis((-28, 20.991385, 33.531384), (1, 0, 0)))[0], mode=Mode.SUBTRACT)
    add(kes_ekstr_zyon13_tool3.solids().sort_by(Axis((-28, 23.33453, 27.874529), (1, 0, 0)))[0], mode=Mode.SUBTRACT)
    add(kes_ekstr_zyon13_tool4.solids().sort_by(Axis((-28, 28.991385, 25.531384), (1, 0, 0)))[0], mode=Mode.SUBTRACT)
    add(kes_ekstr_zyon13_tool5.solids().sort_by(Axis((-28, 34.648239, 27.874529), (1, 0, 0)))[0], mode=Mode.SUBTRACT)


solid = part.part
